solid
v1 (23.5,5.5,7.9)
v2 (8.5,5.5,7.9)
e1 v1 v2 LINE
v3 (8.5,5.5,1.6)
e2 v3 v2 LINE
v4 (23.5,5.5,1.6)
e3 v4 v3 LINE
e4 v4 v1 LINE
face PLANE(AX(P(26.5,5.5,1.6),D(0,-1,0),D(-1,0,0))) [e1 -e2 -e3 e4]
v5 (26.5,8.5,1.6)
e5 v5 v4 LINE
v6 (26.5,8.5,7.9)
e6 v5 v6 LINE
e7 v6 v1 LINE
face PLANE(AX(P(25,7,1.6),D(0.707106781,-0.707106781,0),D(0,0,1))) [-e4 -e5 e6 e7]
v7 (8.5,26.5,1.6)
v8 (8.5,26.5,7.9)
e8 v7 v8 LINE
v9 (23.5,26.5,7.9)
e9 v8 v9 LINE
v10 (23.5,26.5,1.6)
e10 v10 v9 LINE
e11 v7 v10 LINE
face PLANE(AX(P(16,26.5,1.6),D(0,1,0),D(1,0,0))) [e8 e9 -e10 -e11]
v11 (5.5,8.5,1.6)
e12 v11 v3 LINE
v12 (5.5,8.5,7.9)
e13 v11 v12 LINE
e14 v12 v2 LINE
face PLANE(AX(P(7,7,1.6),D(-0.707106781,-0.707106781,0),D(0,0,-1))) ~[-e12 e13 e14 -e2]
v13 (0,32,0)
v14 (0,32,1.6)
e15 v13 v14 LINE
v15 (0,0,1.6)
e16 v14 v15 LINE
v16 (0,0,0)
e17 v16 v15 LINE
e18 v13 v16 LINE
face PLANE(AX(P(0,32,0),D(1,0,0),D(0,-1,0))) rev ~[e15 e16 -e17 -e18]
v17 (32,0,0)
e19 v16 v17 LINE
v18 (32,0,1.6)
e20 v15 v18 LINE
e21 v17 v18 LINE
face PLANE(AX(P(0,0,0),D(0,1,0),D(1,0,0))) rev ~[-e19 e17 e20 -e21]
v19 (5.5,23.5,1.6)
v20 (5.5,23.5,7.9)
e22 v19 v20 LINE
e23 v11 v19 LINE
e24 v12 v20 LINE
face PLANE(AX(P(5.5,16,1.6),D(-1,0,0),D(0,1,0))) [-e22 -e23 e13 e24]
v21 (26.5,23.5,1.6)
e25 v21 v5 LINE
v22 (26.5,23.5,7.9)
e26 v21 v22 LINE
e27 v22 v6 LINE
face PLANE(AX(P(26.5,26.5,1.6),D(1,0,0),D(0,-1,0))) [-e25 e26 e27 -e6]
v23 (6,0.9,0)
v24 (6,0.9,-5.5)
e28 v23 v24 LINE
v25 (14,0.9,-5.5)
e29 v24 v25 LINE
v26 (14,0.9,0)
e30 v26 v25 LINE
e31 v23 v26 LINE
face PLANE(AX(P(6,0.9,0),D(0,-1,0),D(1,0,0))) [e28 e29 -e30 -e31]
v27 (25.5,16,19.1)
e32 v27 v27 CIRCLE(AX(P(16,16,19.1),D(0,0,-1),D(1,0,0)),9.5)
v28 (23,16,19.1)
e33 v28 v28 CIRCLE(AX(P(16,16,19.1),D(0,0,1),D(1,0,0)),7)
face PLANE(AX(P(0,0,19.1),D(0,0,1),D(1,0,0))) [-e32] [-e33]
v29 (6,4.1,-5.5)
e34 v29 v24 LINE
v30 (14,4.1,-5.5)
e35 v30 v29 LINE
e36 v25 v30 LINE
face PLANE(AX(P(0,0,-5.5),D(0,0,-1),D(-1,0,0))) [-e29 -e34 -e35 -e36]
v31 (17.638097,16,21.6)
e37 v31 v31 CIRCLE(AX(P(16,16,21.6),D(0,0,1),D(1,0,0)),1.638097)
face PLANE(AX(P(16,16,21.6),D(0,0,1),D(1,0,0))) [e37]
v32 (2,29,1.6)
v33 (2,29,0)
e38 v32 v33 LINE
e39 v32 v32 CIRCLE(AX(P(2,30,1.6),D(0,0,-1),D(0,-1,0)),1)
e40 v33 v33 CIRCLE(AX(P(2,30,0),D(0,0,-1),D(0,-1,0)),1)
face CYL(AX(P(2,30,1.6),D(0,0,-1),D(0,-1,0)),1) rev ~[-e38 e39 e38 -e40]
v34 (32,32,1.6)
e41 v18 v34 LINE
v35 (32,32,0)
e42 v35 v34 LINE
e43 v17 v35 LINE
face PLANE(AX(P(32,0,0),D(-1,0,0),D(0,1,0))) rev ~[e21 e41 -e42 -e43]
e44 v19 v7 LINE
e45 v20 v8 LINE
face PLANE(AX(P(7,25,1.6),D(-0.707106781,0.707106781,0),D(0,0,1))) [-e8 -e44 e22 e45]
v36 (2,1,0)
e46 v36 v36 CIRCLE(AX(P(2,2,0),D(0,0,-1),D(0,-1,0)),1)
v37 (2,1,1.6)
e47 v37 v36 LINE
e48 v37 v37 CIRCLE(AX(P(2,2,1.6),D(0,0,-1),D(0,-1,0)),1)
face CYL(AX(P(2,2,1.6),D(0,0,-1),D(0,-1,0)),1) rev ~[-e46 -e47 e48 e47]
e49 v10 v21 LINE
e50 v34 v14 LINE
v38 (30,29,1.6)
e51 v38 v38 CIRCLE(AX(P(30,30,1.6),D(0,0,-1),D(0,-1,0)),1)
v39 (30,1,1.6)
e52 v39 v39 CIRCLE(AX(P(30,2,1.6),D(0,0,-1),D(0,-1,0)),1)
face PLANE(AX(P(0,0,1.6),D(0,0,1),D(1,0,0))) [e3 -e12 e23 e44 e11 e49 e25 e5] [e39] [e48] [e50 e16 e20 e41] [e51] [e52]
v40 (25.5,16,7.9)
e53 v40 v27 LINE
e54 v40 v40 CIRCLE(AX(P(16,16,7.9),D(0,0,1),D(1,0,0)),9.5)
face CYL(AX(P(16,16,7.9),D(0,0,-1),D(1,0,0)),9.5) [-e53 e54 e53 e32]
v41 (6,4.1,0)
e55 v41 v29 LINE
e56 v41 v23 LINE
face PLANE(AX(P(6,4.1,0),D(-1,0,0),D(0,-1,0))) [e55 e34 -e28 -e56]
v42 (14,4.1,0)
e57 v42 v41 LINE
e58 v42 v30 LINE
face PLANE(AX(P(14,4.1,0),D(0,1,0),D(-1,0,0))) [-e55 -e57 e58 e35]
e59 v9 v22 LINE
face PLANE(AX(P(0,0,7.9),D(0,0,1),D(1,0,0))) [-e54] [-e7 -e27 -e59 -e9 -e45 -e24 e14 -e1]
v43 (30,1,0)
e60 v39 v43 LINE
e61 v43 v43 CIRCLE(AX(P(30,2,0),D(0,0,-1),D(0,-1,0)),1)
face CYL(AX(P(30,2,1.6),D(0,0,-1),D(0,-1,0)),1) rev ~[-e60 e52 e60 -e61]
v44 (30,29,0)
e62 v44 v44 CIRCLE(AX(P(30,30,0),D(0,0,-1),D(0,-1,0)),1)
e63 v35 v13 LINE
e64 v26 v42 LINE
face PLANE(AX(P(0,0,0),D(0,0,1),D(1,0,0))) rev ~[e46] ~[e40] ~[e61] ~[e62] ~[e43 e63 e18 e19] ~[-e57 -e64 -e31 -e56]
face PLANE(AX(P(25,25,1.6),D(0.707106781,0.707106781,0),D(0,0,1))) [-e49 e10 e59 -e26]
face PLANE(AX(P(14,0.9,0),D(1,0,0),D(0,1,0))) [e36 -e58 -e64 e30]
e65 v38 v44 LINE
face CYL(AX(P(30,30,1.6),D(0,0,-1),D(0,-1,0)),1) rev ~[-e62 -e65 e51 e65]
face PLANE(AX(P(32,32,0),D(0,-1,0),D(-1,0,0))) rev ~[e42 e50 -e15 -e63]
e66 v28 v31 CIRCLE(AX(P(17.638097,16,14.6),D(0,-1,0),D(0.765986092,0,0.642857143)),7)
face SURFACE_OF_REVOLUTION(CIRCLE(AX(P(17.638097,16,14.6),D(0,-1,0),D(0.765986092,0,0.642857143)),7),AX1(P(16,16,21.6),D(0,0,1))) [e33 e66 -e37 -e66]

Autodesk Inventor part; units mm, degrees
ref_plane "YZ Plane" through (0, 0, 0) normal (1, 0, 0) x (0, 1, 0)
ref_plane "XZ Plane" through (0, 0, 0) normal (0, 1, 0) x (-1, 0, 0)
ref_plane "XY Plane" through (0, 0, 0) normal (0, 0, 1) x (1, 0, 0)
sketch "スケッチ1" plane through (0, 0, 0) normal (0, 0, 1) x (1, 0, 0)
  line L0 (0, 0) -> (32, 0)
  line L1 (32, 0) -> (32, 32)
  line L2 (32, 32) -> (0, 32)
  line L3 (0, 32) -> (0, 0)
  dimension "d0" = 32
  dimension "d1" = 32
extrude "押し出し1" add sketch "スケッチ1" along normal blind 1.6
sketch "スケッチ2" plane through (0, 0, 1.6) normal (0, 0, 1) x (1, 0, 0)
  line L0 (0, 0) -> (32, 0) projected
  line L1 (32, 0) -> (32, 32) projected
  line L2 (32, 32) -> (0, 32) projected
  line L3 (0, 32) -> (0, 0) projected
  line L4 (30, 2) -> (2, 2)
  line L5 (2, 2) -> (2, 30)
  line L6 (2, 30) -> (30, 30)
  line L7 (30, 30) -> (30, 2)
  dimension "d4" = 28
hole "穴1" at (30, 30, 1.6) at (30, 2, 1.6) at (2, 2, 1.6) at (2, 30, 1.6) direction (0, 0, -1) diameter 2 end through all
sketch "スケッチ3" plane through (0, 0, 1.6) normal (0, 0, 1) x (1, 0, 0)
  line L0 (5.5, 26.5) -> (26.5, 26.5)
  line L1 (26.5, 26.5) -> (26.5, 5.5)
  line L2 (26.5, 5.5) -> (5.5, 5.5)
  line L3 (5.5, 5.5) -> (5.5, 26.5)
  circle A0 centre (2, 2) radius 1 projected
  circle A1 centre (30, 30) radius 1 projected
  circle A2 centre (30, 2) radius 1 projected
  circle A3 centre (2, 30) radius 1 projected
  line L4 (0, 0) -> (32, 0) projected
  line L5 (32, 0) -> (32, 32) projected
  line L6 (32, 32) -> (0, 32) projected
  line L7 (0, 32) -> (0, 0) projected
  line L8 (16, 26.5) -> (16, 32)
  line L9 (32, 32) -> (0, 32) projected
  line L10 (5.5, 16) -> (0, 16)
  line L11 (0, 32) -> (0, 0) projected
  dimension "d12" = 21
  dimension "d13" = 21
extrude "押し出し2" add sketch "スケッチ3" along normal blind 6.3 contours L0 L1 L2 L3
sketch "スケッチ4" plane through (0, 0, 7.9) normal (0, 0, 1) x (1, 0, 0)
  line L0 (5.5, 26.5) -> (5.5, 5.5) projected
  line L1 (5.5, 5.5) -> (26.5, 5.5) projected
  line L2 (26.5, 5.5) -> (26.5, 26.5) projected
  line L3 (26.5, 26.5) -> (5.5, 26.5) projected
  line L4 (5.5, 26.5) -> (26.5, 26.5) projected
  line L5 (16, 26.5) -> (16, 5.5)
  line L6 (5.5, 5.5) -> (26.5, 5.5) projected
  circle A0 centre (16, 16) radius 9.5
  point P0 (0, 0)
  dimension "d16" = 19
extrude "押し出し3" add sketch "スケッチ4" along normal blind 11.2 contours A0 L5 | L5 A0
sketch "スケッチ5" plane through (16, 16, 19.1) normal (0, 0, 1) x (1, 0, 0)
  circle A0 centre (0, 0) radius 9.5 projected
  circle A1 centre (0, 0) radius 7
  point P0 (-16, -16)
  dimension "d19" = 14
extrude "押し出し4" add sketch "スケッチ5" along normal blind 2.5 contours A1
fillet "フィレット1" radius 7 1 edges at (9, 16, 21.6)
sketch "スケッチ6" plane through (0, 0, 0) normal (0, 0, -1) x (-1, 0, 0)
  line L0 (-14, 4.1) -> (-6, 4.1)
  line L1 (-6, 4.1) -> (-6, 0.9)
  line L2 (-6, 0.9) -> (-14, 0.9)
  line L3 (-14, 0.9) -> (-14, 4.1)
  line L4 (0, 0) -> (-32, 0) projected
  line L5 (0, 32) -> (0, 0) projected
  dimension "d23" = 8
  dimension "d24" = 3.2
  dimension "d25" = 4.1
  dimension "d26" = 14
extrude "押し出し5" add sketch "スケッチ6" along normal blind 5.5
chamfer "面取り1" distance 3 angle 45 4 edges at (5.5, 5.5, 4.75) (26.5, 5.5, 4.75) (26.5, 26.5, 4.75) (5.5, 26.5, 4.75)
properties part number "超広角カメラ_MCM-4350FISH"
